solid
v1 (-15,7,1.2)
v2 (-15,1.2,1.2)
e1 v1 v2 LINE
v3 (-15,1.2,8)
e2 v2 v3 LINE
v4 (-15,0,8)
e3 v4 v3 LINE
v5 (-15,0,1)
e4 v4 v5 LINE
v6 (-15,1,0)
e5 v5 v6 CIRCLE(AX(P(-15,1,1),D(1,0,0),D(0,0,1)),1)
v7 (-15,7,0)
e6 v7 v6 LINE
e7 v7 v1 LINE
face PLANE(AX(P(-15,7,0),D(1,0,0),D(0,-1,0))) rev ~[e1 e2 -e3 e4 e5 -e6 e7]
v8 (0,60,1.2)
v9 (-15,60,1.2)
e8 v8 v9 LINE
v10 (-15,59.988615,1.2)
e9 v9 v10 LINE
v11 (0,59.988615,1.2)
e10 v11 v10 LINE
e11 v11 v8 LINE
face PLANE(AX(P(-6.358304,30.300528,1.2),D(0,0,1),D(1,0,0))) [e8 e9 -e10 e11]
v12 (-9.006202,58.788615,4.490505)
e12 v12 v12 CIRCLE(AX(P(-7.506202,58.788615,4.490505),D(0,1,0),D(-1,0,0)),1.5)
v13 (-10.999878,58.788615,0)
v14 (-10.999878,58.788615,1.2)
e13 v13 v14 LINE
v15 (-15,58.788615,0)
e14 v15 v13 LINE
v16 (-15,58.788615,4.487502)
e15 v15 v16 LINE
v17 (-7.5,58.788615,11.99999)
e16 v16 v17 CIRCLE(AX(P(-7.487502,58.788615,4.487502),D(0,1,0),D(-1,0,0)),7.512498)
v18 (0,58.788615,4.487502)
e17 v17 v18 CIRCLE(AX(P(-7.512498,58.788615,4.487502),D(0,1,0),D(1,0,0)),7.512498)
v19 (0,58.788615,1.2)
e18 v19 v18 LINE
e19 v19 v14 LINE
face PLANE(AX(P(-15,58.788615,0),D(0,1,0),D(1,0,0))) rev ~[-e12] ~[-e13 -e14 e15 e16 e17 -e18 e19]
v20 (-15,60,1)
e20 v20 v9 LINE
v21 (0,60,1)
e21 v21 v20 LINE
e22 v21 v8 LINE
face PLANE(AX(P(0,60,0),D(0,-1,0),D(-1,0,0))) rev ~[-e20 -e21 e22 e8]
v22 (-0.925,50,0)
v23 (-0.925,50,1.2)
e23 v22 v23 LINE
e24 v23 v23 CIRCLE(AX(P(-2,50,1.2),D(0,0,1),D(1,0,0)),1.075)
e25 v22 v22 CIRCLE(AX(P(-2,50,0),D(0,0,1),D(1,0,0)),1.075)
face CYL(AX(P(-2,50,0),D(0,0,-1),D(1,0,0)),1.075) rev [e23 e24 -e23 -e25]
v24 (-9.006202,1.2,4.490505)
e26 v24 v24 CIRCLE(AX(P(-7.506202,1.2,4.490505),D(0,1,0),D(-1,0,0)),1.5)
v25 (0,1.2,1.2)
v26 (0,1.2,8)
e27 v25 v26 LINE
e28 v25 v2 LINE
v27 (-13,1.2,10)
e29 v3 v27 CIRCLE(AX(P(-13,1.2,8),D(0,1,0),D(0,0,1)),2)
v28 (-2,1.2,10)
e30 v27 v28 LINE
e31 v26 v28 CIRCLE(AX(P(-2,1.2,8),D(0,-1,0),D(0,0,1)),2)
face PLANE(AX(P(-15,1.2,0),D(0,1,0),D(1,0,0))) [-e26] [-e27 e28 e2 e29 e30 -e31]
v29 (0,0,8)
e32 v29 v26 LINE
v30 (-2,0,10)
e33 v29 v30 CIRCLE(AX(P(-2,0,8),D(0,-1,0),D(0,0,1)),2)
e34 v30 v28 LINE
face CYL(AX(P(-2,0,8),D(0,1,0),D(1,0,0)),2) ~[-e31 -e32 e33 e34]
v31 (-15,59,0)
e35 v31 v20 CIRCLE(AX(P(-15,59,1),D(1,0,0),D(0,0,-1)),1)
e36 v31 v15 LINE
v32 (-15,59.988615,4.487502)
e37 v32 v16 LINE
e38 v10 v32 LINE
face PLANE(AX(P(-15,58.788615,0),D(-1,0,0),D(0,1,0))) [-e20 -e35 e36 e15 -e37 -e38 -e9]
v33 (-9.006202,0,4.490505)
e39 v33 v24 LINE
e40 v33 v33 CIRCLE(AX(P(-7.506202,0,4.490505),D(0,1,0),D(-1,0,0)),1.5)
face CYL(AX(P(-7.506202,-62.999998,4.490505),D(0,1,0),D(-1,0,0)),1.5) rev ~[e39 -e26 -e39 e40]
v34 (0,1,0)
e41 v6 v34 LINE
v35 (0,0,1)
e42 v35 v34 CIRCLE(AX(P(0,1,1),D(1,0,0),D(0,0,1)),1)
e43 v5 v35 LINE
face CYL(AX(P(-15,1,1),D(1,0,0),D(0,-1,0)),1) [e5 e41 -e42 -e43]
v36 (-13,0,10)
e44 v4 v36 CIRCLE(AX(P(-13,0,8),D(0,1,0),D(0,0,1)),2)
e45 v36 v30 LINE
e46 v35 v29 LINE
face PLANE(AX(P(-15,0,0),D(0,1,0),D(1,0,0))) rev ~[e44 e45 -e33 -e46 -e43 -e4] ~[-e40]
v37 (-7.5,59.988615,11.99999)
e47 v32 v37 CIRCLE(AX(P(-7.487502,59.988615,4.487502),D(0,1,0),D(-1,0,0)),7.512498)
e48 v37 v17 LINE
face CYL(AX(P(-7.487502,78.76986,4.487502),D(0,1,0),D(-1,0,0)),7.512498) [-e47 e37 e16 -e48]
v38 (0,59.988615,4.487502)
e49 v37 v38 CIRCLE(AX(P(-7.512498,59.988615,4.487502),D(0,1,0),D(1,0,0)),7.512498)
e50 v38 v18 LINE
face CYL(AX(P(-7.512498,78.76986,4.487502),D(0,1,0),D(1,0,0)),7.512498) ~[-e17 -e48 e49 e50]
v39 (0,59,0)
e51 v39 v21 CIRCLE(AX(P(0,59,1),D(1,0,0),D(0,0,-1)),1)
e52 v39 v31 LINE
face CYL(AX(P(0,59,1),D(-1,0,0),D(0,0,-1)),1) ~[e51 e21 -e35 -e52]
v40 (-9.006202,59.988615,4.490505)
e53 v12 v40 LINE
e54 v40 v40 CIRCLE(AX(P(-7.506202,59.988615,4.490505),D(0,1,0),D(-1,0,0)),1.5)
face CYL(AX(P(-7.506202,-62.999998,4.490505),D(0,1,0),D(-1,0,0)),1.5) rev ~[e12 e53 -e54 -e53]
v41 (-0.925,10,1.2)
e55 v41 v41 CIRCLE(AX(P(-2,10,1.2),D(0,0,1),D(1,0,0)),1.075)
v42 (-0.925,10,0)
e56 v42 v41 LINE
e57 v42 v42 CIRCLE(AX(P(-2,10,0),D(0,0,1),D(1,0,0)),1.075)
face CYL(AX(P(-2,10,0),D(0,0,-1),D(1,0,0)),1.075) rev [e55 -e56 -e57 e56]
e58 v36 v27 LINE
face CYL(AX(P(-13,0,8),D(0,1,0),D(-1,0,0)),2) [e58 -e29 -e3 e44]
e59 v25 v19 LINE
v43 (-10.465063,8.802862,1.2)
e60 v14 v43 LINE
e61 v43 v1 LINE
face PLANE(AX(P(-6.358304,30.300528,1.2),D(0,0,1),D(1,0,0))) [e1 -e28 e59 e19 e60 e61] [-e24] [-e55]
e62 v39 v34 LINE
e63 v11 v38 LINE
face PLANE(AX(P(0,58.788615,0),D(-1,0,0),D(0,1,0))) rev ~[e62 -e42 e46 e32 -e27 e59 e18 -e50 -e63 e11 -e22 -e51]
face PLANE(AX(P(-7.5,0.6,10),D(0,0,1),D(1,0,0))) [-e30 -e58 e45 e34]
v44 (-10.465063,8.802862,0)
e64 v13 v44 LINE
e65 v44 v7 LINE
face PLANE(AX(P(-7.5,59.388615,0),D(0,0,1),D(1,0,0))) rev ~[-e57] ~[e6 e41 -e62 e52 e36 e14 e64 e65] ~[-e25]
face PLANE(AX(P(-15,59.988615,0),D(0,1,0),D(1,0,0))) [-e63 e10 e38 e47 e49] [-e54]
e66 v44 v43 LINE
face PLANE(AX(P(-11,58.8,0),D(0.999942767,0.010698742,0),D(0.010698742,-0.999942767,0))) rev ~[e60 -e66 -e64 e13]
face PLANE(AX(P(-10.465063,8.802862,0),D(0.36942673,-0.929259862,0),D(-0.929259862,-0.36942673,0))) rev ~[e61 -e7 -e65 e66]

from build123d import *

# Parameters (mm, degrees)
F0_R        = 1.075
F3_DEPTH    = 1.2
F2_W        = 15
F2_H        = 1.2
F4_DEPTH    = 10
F1_W        = 15
F1_H        = 1.2
F5_DEPTH    = 12
F6_T1_DEPTH = 38.762491
F7_R        = 2
F8_R        = 1
F10_D       = 3


# Not quite as in the source:
# - a fillet or chamfer that OpenCascade refuses, or shapes differently, is made with other operations: its cross-section is extruded or revolved along the edge and cut away or added


with BuildPart() as f3:
    # F0 (on Top) → F3 (new body)
    with BuildSketch(Plane.XY):
        Polygon((-15, 0), (0, 0), (0, 60), (-15, 60), (-15, 58.8), (-11, 58.8), (-10.4650629229, 8.8028616587), (-15, 7), align=None)
        with Locations((-2, 10)):
            Circle(F0_R, mode=Mode.SUBTRACT)
        with Locations((-2, 50)):
            Circle(F0_R, mode=Mode.SUBTRACT)
    extrude(amount=F3_DEPTH)

    # F2 (on face) → F4 (join)
    with BuildSketch(Plane.XY):
        with Locations((-7.5, 0.6)):
            Rectangle(F2_W, F2_H)
    extrude(amount=F4_DEPTH)

    # F1 (on face) → F5 (join)
    with BuildSketch(Plane.XY):
        with Locations((-7.5, 59.3886146865)):
            Rectangle(F1_W, F1_H)
    extrude(amount=F5_DEPTH)

    # F6: fillet of radius 7.5124982 on 2 edges, made by hand

    # F6_s2 → F6_t1 (cut)
    with BuildSketch(Plane.XZ.offset(-78.7698601865)):
        with BuildLine():
            ThreePointArc((0, 4.4875018), (-2.2003597791, 9.7996402209), (-7.5124982, 12))
            Line((-7.5124982, 12), (0, 12))
            Line((0, 12), (0, 4.4875018))
        make_face()
        with BuildLine():
            ThreePointArc((-15, 4.4875018), (-12.7996402209, 9.7996402209), (-7.4875018, 12))
            Line((-7.4875018, 12), (-15, 12))
            Line((-15, 12), (-15, 4.4875018))
        make_face()
    extrude(amount=F6_T1_DEPTH, mode=Mode.SUBTRACT)

    # F7
    f7_edges = [f3.edges().sort_by_distance(p)[0] for p in [
        (0, 0.6, 10),
        (-15, 0.6, 10),
    ]]
    fillet(f7_edges, radius=F7_R)

    # F8
    f8_edges = [f3.edges().sort_by_distance(p)[0] for p in [
        (-7.5, 0, 0),
        (-7.5, 60, 0),
    ]]
    fillet(f8_edges, radius=F8_R)

    # F10 (through all)
    with Locations(Plane.XZ):
        with Locations((-7.506201975, 4.490504507)):
            Hole(F10_D / 2)


solid = f3.part
